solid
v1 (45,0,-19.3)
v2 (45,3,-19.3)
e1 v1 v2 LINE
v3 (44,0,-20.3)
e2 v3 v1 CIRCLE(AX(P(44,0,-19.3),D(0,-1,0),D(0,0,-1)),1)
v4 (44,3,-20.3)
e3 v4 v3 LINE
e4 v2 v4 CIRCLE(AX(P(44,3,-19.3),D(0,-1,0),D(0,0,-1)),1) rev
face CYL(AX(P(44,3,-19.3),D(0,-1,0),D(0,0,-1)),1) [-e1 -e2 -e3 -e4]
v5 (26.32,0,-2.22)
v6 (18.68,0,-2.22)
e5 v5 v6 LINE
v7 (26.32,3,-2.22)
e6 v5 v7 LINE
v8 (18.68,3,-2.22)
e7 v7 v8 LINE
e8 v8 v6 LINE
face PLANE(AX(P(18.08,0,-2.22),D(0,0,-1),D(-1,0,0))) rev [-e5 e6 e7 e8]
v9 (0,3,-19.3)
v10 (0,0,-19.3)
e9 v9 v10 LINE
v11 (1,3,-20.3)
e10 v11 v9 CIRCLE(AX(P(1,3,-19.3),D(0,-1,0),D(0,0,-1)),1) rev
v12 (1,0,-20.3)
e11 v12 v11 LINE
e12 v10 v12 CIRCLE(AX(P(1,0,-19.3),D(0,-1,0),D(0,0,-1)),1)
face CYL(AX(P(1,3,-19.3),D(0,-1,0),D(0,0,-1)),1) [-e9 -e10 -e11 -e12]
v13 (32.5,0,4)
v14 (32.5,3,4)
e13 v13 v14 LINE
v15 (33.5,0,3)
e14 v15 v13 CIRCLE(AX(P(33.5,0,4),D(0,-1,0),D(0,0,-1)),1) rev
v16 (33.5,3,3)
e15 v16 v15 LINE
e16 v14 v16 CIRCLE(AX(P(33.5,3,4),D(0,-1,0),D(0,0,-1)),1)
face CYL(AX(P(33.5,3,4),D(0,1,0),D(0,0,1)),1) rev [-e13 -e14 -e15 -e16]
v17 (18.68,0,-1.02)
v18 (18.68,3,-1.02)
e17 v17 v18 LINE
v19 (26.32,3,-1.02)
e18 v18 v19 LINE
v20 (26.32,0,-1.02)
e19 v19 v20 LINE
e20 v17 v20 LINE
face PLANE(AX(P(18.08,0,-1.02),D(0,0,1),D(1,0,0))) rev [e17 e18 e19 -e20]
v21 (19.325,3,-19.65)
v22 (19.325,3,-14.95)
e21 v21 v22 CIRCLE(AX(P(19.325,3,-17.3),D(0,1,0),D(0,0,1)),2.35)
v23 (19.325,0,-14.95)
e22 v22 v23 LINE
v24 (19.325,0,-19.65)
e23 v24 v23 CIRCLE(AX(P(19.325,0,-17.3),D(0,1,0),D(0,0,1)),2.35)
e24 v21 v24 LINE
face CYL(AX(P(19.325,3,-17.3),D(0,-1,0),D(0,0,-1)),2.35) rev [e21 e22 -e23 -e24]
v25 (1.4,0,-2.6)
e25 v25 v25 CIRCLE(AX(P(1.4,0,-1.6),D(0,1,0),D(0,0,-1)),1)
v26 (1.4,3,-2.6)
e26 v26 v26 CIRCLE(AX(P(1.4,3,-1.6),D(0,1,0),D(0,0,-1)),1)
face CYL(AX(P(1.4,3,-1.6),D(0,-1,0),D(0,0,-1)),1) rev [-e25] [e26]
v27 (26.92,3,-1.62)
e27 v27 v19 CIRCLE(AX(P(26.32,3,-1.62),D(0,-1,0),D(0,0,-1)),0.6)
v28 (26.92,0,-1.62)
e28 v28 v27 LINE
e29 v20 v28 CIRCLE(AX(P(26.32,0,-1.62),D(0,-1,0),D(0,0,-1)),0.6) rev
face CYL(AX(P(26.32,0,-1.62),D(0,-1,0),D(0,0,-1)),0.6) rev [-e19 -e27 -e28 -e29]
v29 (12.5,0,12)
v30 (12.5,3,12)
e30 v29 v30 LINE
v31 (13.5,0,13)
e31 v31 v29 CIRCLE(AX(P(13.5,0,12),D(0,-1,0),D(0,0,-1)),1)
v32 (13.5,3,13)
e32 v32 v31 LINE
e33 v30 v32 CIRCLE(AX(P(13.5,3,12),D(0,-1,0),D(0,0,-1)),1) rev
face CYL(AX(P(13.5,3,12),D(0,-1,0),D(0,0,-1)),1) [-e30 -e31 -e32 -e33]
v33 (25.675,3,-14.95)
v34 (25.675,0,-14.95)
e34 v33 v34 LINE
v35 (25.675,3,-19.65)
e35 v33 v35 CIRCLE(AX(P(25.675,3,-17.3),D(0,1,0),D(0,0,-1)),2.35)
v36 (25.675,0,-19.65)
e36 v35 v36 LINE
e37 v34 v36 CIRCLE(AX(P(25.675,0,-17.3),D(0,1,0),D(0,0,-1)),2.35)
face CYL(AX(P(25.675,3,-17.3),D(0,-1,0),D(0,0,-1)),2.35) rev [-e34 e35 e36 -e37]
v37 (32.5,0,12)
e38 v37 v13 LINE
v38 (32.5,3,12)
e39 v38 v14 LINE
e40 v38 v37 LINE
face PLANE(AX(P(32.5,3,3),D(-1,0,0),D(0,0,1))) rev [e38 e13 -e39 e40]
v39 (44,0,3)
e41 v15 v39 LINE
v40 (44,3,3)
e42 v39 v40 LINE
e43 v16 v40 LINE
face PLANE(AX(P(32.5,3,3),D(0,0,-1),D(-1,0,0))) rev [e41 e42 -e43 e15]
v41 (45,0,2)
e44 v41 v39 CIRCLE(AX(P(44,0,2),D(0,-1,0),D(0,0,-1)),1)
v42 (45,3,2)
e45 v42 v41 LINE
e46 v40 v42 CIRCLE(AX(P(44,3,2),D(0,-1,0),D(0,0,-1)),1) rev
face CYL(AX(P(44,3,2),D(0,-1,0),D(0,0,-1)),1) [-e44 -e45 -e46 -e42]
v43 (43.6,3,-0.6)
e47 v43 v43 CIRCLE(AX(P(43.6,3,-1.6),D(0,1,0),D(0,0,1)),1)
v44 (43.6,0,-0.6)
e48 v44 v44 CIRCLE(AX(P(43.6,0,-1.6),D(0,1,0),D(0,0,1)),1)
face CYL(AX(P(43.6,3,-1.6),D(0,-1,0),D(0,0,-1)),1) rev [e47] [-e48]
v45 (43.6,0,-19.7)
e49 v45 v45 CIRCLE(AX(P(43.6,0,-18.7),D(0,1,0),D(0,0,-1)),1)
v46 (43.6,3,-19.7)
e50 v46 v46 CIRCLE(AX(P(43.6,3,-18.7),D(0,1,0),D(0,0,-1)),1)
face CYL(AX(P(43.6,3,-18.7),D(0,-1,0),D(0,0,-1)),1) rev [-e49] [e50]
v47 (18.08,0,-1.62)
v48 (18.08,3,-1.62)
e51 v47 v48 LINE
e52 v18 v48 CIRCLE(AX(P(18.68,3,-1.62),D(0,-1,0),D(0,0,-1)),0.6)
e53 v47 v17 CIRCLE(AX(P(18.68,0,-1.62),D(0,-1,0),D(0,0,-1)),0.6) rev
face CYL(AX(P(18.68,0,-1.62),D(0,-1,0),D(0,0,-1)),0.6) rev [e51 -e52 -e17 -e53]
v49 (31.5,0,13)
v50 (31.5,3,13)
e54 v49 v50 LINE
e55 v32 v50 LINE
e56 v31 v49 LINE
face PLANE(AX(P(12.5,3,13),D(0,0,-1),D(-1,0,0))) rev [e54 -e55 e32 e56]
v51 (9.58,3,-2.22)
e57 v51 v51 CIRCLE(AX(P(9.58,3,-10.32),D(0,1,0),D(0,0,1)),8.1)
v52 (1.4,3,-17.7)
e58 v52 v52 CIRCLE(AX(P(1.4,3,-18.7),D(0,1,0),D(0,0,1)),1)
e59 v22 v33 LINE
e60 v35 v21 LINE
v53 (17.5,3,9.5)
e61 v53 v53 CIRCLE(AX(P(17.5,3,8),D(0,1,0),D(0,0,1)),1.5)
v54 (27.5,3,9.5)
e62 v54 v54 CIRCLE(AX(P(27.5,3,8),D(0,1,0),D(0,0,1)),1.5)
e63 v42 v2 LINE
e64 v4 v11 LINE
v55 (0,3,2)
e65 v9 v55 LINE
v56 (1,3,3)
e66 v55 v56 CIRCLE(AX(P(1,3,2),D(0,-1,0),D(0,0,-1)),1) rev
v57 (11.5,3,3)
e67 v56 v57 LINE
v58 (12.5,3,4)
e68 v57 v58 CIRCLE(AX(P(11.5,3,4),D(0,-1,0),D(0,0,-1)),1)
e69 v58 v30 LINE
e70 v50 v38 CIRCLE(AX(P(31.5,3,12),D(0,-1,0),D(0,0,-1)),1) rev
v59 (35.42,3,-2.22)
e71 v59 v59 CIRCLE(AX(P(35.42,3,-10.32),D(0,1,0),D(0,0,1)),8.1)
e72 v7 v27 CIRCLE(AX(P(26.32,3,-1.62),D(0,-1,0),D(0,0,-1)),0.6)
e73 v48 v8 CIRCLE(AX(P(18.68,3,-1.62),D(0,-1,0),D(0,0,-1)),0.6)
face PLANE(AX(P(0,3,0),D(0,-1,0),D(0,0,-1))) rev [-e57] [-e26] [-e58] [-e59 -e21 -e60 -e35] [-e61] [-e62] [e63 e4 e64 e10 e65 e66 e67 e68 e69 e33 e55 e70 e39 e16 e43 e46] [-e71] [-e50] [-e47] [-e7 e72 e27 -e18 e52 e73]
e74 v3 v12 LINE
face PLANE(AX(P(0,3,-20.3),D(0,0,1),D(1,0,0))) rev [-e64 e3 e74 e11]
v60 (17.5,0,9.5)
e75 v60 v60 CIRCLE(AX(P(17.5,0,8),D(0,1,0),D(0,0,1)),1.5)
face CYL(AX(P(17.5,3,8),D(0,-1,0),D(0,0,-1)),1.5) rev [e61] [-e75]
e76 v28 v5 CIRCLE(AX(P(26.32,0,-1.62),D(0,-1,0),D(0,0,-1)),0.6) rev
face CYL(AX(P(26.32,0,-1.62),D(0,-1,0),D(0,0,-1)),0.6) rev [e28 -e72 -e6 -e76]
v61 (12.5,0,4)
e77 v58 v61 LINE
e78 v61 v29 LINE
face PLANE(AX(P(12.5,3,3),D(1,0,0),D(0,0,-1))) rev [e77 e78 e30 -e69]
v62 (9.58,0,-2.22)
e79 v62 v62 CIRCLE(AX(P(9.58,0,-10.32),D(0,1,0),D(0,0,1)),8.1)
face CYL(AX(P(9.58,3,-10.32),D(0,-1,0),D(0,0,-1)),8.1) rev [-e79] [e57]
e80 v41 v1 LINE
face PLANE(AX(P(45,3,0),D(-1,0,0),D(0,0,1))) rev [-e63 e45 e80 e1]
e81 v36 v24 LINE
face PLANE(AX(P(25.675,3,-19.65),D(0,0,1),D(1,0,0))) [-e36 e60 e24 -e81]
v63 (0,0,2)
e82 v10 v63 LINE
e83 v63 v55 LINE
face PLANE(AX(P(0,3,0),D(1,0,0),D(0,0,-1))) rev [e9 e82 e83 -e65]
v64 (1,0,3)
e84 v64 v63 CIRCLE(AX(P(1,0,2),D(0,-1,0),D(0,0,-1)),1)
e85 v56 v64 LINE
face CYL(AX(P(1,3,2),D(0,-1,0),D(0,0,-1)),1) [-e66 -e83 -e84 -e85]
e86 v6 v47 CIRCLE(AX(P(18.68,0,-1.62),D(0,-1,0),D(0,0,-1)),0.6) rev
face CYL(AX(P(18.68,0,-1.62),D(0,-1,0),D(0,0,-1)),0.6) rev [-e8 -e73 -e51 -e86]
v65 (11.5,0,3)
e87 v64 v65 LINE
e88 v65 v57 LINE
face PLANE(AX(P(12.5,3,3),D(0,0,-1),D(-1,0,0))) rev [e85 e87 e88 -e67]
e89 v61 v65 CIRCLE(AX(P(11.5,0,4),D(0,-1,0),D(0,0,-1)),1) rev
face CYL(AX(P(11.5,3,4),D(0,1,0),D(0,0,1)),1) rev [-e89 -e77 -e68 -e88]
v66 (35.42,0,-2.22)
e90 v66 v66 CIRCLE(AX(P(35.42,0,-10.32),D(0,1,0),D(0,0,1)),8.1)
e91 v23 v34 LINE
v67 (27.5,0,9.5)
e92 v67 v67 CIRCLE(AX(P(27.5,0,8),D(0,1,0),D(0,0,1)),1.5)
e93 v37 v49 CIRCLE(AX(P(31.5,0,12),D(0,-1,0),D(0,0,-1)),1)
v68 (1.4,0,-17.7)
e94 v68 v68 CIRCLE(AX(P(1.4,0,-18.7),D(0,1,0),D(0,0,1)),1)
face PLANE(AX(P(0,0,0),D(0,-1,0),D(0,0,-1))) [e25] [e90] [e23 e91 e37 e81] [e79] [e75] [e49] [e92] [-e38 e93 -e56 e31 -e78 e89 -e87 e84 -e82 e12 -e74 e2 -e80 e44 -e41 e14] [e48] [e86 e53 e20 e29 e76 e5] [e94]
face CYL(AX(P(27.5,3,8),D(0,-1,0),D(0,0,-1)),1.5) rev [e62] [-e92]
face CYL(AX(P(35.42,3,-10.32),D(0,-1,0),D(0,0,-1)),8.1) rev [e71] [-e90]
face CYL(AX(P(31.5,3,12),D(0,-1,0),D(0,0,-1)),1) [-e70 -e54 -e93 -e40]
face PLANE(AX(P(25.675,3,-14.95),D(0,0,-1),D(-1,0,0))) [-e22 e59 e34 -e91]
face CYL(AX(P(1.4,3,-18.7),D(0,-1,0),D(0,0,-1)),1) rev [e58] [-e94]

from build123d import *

# Parameters (mm, degrees)
SKETCH1_R           = 1
SKETCH1_R_2         = 8.1
SKETCH1_R_3         = 1.5
BOSS_EXTRUDE1_DEPTH = 3
SKETCH2_W           = 8.84
SKETCH2_H           = 1.2
CUT_EXTRUDE1_DEPTH  = 3
FILLET1_R           = 1
FILLET4_R           = 0.6


with BuildPart() as part:
    # Sketch1 → Boss-Extrude1 (new body)
    with BuildSketch(Plane(origin=(0, 0, 0), x_dir=(1, 0, 0), z_dir=(0, 1, 0))):
        Polygon((0, 0), (0, 20.3), (45, 20.3), (45, 0), (45, -3), (32.5, -3), (32.5, -13), (12.5, -13), (12.5, -3), (0, -3), align=None)
        with Locations(Location((1.4, 18.7, 0), (0, 0, 270))):
            Circle(SKETCH1_R, mode=Mode.SUBTRACT)
        with Locations(Location((1.4, 1.6, 0), (0, 0, 90))):
            Circle(SKETCH1_R, mode=Mode.SUBTRACT)
        with Locations(Location((43.6, 1.6, 0), (0, 0, 270))):
            Circle(SKETCH1_R, mode=Mode.SUBTRACT)
        with Locations(Location((43.6, 18.7, 0), (0, 0, 90))):
            Circle(SKETCH1_R, mode=Mode.SUBTRACT)
        with Locations(Location((9.58, 10.32, 0), (0, 0, 270))):
            Circle(SKETCH1_R_2, mode=Mode.SUBTRACT)
        with Locations(Location((35.42, 10.32, 0), (0, 0, 270))):
            Circle(SKETCH1_R_2, mode=Mode.SUBTRACT)
        with Locations(Location((17.5, -8, 0), (0, 0, 270))):
            Circle(SKETCH1_R_3, mode=Mode.SUBTRACT)
        with Locations(Location((27.5, -8, 0), (0, 0, 270))):
            Circle(SKETCH1_R_3, mode=Mode.SUBTRACT)
        with BuildLine():
            Line((25.675, 19.65), (19.325, 19.65))
            ThreePointArc((19.325, 19.65), (16.975, 17.3), (19.325, 14.95))
            Line((19.325, 14.95), (25.675, 14.95))
            ThreePointArc((25.675, 14.95), (28.025, 17.3), (25.675, 19.65))
        make_face(mode=Mode.SUBTRACT)
    extrude(amount=BOSS_EXTRUDE1_DEPTH)

    # Sketch2 → Cut-Extrude1 (cut)
    with BuildSketch(Plane(origin=(0, 3, 0), x_dir=(1, 0, 0), z_dir=(0, 1, 0))):
        with Locations((22.5, 1.62)):
            Rectangle(SKETCH2_W, SKETCH2_H)
    extrude(amount=-CUT_EXTRUDE1_DEPTH, mode=Mode.SUBTRACT)

    # Fillet1
    fillet1_edges = [part.edges().sort_by_distance(p)[0] for p in [
        (0, 1.5, -20.3),
        (45, 1.5, -20.3),
        (45, 1.5, 3),
        (32.5, 1.5, 3),
        (32.5, 1.5, 13),
        (12.5, 1.5, 13),
        (12.5, 1.5, 3),
        (0, 1.5, 3),
    ]]
    fillet(fillet1_edges, radius=FILLET1_R)

    # Fillet4
    fillet4_edges = [part.edges().sort_by_distance(p)[0] for p in [
        (26.92, 1.5, -2.22),
        (26.92, 1.5, -1.02),
        (18.08, 1.5, -1.02),
        (18.08, 1.5, -2.22),
    ]]
    fillet(fillet4_edges, radius=FILLET4_R - 0.0001)  # a hair under: the kernel refuses the full size


solid = part.part
